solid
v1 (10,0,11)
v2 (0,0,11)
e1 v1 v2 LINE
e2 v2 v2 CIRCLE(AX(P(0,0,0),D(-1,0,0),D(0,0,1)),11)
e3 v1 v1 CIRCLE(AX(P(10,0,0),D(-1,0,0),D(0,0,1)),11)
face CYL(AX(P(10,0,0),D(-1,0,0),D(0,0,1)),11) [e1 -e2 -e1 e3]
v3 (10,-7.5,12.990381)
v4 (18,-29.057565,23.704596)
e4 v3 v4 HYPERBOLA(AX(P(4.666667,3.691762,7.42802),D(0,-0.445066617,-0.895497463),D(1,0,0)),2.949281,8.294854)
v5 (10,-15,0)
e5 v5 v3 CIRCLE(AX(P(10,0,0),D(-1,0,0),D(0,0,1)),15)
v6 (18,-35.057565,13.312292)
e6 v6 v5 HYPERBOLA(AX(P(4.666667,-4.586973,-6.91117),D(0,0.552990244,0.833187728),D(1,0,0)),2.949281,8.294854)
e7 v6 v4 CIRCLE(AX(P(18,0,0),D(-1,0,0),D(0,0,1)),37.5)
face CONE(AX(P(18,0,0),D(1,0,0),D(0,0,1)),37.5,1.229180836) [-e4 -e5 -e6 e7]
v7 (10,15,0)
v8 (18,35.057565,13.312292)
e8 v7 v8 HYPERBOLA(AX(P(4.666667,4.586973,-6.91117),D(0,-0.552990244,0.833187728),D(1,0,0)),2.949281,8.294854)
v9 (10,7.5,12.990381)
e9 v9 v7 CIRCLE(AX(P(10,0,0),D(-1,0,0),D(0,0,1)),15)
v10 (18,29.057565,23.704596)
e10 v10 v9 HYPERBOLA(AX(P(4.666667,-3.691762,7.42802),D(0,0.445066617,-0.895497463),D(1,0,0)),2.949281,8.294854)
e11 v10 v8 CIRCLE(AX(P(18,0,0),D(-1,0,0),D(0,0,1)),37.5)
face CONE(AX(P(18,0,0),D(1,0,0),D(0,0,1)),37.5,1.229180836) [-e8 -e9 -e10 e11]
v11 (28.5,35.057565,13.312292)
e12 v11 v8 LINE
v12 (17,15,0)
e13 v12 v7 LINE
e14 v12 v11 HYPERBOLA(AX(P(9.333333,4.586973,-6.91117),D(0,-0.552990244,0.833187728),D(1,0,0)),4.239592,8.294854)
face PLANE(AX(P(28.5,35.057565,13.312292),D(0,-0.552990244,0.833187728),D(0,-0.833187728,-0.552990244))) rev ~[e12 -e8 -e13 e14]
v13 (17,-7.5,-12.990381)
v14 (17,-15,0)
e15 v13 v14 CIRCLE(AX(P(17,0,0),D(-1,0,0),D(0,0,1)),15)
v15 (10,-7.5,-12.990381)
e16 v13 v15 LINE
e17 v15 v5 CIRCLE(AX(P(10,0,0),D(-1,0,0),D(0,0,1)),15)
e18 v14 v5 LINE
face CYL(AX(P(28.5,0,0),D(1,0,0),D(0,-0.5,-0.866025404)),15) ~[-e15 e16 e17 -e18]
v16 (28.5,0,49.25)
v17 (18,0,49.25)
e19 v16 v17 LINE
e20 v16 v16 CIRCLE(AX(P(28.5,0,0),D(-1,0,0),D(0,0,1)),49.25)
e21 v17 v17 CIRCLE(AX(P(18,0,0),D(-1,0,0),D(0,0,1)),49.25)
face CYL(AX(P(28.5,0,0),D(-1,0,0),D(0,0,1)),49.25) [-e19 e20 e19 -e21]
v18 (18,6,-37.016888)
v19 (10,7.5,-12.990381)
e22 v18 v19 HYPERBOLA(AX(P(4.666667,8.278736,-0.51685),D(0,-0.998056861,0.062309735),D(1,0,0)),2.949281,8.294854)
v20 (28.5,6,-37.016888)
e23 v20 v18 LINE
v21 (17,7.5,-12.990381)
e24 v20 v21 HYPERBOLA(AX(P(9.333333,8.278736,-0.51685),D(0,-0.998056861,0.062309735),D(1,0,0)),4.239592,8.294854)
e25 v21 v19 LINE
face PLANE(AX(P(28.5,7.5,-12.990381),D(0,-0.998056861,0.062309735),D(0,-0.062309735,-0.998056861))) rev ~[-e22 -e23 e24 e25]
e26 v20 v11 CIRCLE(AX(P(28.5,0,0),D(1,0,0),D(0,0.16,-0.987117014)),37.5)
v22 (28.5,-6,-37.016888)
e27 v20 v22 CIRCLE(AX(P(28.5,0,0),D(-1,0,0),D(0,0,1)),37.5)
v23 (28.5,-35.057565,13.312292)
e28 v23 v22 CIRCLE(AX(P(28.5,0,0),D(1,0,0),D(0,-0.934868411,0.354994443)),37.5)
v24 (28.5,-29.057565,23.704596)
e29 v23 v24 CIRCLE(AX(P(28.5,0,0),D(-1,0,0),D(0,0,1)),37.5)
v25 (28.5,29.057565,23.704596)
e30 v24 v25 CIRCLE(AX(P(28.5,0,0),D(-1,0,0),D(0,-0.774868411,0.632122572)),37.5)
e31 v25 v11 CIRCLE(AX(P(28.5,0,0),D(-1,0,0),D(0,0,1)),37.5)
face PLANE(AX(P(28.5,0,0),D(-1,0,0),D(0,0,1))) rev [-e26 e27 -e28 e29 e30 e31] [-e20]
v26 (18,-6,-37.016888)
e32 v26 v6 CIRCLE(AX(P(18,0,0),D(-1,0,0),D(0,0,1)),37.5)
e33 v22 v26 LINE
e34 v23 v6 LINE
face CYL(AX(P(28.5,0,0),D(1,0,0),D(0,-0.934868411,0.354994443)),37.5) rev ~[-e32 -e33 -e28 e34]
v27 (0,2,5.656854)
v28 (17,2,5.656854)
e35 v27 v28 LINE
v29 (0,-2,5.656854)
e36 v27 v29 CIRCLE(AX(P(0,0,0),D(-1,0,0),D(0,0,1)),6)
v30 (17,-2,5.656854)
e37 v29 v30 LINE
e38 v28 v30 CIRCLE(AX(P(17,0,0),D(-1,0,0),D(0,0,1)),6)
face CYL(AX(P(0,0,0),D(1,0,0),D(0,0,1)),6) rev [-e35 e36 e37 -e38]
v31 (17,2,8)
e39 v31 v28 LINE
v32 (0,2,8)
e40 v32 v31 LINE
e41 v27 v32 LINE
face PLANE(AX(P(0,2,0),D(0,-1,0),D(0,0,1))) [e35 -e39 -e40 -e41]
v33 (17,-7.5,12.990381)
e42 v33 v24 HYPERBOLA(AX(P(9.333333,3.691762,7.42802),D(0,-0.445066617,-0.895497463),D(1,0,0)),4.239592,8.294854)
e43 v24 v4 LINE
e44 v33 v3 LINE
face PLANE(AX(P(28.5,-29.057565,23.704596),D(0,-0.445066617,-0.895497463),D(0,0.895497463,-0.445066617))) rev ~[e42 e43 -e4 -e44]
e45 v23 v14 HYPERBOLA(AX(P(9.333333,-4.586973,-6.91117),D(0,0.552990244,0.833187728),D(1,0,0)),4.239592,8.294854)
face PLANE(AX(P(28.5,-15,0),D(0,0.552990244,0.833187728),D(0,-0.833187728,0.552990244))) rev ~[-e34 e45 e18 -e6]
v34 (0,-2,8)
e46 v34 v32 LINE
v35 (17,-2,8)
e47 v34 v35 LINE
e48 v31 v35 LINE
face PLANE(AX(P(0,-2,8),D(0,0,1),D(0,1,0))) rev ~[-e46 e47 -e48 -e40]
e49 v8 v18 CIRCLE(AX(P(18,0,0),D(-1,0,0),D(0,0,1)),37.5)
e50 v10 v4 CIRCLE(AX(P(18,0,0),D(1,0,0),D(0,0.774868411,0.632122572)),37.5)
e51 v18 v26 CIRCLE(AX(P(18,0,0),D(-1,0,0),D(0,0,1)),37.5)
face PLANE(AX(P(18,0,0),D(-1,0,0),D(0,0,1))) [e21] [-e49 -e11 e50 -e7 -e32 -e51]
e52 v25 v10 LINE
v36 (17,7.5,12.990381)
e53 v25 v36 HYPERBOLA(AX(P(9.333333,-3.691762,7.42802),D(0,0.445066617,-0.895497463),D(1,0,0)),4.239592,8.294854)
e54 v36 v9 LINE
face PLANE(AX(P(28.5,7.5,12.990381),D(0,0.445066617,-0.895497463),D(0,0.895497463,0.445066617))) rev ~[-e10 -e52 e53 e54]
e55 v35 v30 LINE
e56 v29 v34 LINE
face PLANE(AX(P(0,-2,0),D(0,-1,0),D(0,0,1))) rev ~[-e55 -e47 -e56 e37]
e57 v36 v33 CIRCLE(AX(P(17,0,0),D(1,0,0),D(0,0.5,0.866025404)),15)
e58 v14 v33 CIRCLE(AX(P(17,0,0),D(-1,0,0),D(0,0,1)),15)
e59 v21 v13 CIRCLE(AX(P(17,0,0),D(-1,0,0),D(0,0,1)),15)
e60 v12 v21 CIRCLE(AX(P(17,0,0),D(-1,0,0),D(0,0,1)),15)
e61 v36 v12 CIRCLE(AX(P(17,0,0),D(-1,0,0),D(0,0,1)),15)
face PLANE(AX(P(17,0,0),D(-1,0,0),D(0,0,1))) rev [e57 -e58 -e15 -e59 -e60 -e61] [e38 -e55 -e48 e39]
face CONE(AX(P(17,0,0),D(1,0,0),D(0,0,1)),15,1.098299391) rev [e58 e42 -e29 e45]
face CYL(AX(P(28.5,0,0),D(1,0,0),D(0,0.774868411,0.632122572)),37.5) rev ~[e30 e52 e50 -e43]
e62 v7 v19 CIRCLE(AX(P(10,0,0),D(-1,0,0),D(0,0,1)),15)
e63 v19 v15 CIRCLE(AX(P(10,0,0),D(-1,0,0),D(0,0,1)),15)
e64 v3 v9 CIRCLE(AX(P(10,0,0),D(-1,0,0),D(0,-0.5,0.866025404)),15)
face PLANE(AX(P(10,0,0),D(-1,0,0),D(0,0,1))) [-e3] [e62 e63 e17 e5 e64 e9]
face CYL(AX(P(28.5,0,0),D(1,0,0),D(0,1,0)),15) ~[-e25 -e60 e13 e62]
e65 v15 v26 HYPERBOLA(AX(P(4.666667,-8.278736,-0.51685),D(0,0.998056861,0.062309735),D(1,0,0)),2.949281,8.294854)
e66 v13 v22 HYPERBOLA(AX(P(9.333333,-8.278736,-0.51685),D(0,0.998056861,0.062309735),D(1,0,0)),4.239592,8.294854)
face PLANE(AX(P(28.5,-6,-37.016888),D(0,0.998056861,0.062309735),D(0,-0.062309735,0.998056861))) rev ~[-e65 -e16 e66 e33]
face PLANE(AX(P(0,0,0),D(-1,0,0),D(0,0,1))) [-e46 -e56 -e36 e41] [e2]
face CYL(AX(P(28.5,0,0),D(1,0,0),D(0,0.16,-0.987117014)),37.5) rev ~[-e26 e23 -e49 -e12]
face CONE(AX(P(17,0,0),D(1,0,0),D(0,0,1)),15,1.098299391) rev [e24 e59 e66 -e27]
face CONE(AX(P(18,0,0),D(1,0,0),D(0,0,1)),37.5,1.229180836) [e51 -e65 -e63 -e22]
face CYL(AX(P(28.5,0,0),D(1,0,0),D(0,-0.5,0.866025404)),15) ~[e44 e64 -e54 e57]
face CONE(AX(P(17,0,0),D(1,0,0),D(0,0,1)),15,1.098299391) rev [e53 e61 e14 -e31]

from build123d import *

# Parameters (mm, degrees)
F2_W            = 4
F2_H            = 8
F3_DEPTH        = 25
F5_DEPTH        = 28.501
F5_COPIES_COUNT = 3


# Not quite as in the source:
# - a pattern or mirror of a feature is missing from the dataset's text; its kind, count and spacing are read off the source's solid


with BuildPart() as f1:
    # F0 (on Front) → F1 (revolve)
    with BuildSketch(Plane.XZ):
        Polygon((0, 11), (0, 6), (17, 6), (17, 15), (28.5, 37.5), (28.5, 49.25), (18, 49.25), (18, 37.5), (10, 15), (10, 11), align=None)
    revolve(axis=Axis((-9.663007474, 0, 0), (-1, 0, 0)))

    # F2 (on Right) → F3 (cut)
    with BuildSketch(Plane.YZ):
        with Locations((0, 4)):
            Rectangle(F2_W, F2_H)
    extrude(amount=F3_DEPTH, mode=Mode.SUBTRACT)

    # F4 (on face) → F5 (cut, through all)
    with BuildSketch(Plane.YZ.offset(28.5)):
        with BuildLine():
            Line((7.5, 12.9903810568), (29.0575654097, 23.7045964416))
            ThreePointArc((29.0575654097, 23.7045964416), (0, 37.5), (-29.0575654097, 23.7045964416))
            Line((-29.0575654097, 23.7045964416), (-7.5, 12.9903810568))
            ThreePointArc((-7.5, 12.9903810568), (0, 15), (7.5, 12.9903810568))
        make_face()
    f5 = extrude(amount=-F5_DEPTH, mode=Mode.SUBTRACT)

    # F5_copies: F5 ×3 about axis
    f5_copies_axis = Axis((0, 0, 0), (1, 0, 0))
    for i in range(1, F5_COPIES_COUNT):
        add(f5.rotate(f5_copies_axis, i * 360 / F5_COPIES_COUNT), mode=Mode.SUBTRACT)


solid = f1.part
